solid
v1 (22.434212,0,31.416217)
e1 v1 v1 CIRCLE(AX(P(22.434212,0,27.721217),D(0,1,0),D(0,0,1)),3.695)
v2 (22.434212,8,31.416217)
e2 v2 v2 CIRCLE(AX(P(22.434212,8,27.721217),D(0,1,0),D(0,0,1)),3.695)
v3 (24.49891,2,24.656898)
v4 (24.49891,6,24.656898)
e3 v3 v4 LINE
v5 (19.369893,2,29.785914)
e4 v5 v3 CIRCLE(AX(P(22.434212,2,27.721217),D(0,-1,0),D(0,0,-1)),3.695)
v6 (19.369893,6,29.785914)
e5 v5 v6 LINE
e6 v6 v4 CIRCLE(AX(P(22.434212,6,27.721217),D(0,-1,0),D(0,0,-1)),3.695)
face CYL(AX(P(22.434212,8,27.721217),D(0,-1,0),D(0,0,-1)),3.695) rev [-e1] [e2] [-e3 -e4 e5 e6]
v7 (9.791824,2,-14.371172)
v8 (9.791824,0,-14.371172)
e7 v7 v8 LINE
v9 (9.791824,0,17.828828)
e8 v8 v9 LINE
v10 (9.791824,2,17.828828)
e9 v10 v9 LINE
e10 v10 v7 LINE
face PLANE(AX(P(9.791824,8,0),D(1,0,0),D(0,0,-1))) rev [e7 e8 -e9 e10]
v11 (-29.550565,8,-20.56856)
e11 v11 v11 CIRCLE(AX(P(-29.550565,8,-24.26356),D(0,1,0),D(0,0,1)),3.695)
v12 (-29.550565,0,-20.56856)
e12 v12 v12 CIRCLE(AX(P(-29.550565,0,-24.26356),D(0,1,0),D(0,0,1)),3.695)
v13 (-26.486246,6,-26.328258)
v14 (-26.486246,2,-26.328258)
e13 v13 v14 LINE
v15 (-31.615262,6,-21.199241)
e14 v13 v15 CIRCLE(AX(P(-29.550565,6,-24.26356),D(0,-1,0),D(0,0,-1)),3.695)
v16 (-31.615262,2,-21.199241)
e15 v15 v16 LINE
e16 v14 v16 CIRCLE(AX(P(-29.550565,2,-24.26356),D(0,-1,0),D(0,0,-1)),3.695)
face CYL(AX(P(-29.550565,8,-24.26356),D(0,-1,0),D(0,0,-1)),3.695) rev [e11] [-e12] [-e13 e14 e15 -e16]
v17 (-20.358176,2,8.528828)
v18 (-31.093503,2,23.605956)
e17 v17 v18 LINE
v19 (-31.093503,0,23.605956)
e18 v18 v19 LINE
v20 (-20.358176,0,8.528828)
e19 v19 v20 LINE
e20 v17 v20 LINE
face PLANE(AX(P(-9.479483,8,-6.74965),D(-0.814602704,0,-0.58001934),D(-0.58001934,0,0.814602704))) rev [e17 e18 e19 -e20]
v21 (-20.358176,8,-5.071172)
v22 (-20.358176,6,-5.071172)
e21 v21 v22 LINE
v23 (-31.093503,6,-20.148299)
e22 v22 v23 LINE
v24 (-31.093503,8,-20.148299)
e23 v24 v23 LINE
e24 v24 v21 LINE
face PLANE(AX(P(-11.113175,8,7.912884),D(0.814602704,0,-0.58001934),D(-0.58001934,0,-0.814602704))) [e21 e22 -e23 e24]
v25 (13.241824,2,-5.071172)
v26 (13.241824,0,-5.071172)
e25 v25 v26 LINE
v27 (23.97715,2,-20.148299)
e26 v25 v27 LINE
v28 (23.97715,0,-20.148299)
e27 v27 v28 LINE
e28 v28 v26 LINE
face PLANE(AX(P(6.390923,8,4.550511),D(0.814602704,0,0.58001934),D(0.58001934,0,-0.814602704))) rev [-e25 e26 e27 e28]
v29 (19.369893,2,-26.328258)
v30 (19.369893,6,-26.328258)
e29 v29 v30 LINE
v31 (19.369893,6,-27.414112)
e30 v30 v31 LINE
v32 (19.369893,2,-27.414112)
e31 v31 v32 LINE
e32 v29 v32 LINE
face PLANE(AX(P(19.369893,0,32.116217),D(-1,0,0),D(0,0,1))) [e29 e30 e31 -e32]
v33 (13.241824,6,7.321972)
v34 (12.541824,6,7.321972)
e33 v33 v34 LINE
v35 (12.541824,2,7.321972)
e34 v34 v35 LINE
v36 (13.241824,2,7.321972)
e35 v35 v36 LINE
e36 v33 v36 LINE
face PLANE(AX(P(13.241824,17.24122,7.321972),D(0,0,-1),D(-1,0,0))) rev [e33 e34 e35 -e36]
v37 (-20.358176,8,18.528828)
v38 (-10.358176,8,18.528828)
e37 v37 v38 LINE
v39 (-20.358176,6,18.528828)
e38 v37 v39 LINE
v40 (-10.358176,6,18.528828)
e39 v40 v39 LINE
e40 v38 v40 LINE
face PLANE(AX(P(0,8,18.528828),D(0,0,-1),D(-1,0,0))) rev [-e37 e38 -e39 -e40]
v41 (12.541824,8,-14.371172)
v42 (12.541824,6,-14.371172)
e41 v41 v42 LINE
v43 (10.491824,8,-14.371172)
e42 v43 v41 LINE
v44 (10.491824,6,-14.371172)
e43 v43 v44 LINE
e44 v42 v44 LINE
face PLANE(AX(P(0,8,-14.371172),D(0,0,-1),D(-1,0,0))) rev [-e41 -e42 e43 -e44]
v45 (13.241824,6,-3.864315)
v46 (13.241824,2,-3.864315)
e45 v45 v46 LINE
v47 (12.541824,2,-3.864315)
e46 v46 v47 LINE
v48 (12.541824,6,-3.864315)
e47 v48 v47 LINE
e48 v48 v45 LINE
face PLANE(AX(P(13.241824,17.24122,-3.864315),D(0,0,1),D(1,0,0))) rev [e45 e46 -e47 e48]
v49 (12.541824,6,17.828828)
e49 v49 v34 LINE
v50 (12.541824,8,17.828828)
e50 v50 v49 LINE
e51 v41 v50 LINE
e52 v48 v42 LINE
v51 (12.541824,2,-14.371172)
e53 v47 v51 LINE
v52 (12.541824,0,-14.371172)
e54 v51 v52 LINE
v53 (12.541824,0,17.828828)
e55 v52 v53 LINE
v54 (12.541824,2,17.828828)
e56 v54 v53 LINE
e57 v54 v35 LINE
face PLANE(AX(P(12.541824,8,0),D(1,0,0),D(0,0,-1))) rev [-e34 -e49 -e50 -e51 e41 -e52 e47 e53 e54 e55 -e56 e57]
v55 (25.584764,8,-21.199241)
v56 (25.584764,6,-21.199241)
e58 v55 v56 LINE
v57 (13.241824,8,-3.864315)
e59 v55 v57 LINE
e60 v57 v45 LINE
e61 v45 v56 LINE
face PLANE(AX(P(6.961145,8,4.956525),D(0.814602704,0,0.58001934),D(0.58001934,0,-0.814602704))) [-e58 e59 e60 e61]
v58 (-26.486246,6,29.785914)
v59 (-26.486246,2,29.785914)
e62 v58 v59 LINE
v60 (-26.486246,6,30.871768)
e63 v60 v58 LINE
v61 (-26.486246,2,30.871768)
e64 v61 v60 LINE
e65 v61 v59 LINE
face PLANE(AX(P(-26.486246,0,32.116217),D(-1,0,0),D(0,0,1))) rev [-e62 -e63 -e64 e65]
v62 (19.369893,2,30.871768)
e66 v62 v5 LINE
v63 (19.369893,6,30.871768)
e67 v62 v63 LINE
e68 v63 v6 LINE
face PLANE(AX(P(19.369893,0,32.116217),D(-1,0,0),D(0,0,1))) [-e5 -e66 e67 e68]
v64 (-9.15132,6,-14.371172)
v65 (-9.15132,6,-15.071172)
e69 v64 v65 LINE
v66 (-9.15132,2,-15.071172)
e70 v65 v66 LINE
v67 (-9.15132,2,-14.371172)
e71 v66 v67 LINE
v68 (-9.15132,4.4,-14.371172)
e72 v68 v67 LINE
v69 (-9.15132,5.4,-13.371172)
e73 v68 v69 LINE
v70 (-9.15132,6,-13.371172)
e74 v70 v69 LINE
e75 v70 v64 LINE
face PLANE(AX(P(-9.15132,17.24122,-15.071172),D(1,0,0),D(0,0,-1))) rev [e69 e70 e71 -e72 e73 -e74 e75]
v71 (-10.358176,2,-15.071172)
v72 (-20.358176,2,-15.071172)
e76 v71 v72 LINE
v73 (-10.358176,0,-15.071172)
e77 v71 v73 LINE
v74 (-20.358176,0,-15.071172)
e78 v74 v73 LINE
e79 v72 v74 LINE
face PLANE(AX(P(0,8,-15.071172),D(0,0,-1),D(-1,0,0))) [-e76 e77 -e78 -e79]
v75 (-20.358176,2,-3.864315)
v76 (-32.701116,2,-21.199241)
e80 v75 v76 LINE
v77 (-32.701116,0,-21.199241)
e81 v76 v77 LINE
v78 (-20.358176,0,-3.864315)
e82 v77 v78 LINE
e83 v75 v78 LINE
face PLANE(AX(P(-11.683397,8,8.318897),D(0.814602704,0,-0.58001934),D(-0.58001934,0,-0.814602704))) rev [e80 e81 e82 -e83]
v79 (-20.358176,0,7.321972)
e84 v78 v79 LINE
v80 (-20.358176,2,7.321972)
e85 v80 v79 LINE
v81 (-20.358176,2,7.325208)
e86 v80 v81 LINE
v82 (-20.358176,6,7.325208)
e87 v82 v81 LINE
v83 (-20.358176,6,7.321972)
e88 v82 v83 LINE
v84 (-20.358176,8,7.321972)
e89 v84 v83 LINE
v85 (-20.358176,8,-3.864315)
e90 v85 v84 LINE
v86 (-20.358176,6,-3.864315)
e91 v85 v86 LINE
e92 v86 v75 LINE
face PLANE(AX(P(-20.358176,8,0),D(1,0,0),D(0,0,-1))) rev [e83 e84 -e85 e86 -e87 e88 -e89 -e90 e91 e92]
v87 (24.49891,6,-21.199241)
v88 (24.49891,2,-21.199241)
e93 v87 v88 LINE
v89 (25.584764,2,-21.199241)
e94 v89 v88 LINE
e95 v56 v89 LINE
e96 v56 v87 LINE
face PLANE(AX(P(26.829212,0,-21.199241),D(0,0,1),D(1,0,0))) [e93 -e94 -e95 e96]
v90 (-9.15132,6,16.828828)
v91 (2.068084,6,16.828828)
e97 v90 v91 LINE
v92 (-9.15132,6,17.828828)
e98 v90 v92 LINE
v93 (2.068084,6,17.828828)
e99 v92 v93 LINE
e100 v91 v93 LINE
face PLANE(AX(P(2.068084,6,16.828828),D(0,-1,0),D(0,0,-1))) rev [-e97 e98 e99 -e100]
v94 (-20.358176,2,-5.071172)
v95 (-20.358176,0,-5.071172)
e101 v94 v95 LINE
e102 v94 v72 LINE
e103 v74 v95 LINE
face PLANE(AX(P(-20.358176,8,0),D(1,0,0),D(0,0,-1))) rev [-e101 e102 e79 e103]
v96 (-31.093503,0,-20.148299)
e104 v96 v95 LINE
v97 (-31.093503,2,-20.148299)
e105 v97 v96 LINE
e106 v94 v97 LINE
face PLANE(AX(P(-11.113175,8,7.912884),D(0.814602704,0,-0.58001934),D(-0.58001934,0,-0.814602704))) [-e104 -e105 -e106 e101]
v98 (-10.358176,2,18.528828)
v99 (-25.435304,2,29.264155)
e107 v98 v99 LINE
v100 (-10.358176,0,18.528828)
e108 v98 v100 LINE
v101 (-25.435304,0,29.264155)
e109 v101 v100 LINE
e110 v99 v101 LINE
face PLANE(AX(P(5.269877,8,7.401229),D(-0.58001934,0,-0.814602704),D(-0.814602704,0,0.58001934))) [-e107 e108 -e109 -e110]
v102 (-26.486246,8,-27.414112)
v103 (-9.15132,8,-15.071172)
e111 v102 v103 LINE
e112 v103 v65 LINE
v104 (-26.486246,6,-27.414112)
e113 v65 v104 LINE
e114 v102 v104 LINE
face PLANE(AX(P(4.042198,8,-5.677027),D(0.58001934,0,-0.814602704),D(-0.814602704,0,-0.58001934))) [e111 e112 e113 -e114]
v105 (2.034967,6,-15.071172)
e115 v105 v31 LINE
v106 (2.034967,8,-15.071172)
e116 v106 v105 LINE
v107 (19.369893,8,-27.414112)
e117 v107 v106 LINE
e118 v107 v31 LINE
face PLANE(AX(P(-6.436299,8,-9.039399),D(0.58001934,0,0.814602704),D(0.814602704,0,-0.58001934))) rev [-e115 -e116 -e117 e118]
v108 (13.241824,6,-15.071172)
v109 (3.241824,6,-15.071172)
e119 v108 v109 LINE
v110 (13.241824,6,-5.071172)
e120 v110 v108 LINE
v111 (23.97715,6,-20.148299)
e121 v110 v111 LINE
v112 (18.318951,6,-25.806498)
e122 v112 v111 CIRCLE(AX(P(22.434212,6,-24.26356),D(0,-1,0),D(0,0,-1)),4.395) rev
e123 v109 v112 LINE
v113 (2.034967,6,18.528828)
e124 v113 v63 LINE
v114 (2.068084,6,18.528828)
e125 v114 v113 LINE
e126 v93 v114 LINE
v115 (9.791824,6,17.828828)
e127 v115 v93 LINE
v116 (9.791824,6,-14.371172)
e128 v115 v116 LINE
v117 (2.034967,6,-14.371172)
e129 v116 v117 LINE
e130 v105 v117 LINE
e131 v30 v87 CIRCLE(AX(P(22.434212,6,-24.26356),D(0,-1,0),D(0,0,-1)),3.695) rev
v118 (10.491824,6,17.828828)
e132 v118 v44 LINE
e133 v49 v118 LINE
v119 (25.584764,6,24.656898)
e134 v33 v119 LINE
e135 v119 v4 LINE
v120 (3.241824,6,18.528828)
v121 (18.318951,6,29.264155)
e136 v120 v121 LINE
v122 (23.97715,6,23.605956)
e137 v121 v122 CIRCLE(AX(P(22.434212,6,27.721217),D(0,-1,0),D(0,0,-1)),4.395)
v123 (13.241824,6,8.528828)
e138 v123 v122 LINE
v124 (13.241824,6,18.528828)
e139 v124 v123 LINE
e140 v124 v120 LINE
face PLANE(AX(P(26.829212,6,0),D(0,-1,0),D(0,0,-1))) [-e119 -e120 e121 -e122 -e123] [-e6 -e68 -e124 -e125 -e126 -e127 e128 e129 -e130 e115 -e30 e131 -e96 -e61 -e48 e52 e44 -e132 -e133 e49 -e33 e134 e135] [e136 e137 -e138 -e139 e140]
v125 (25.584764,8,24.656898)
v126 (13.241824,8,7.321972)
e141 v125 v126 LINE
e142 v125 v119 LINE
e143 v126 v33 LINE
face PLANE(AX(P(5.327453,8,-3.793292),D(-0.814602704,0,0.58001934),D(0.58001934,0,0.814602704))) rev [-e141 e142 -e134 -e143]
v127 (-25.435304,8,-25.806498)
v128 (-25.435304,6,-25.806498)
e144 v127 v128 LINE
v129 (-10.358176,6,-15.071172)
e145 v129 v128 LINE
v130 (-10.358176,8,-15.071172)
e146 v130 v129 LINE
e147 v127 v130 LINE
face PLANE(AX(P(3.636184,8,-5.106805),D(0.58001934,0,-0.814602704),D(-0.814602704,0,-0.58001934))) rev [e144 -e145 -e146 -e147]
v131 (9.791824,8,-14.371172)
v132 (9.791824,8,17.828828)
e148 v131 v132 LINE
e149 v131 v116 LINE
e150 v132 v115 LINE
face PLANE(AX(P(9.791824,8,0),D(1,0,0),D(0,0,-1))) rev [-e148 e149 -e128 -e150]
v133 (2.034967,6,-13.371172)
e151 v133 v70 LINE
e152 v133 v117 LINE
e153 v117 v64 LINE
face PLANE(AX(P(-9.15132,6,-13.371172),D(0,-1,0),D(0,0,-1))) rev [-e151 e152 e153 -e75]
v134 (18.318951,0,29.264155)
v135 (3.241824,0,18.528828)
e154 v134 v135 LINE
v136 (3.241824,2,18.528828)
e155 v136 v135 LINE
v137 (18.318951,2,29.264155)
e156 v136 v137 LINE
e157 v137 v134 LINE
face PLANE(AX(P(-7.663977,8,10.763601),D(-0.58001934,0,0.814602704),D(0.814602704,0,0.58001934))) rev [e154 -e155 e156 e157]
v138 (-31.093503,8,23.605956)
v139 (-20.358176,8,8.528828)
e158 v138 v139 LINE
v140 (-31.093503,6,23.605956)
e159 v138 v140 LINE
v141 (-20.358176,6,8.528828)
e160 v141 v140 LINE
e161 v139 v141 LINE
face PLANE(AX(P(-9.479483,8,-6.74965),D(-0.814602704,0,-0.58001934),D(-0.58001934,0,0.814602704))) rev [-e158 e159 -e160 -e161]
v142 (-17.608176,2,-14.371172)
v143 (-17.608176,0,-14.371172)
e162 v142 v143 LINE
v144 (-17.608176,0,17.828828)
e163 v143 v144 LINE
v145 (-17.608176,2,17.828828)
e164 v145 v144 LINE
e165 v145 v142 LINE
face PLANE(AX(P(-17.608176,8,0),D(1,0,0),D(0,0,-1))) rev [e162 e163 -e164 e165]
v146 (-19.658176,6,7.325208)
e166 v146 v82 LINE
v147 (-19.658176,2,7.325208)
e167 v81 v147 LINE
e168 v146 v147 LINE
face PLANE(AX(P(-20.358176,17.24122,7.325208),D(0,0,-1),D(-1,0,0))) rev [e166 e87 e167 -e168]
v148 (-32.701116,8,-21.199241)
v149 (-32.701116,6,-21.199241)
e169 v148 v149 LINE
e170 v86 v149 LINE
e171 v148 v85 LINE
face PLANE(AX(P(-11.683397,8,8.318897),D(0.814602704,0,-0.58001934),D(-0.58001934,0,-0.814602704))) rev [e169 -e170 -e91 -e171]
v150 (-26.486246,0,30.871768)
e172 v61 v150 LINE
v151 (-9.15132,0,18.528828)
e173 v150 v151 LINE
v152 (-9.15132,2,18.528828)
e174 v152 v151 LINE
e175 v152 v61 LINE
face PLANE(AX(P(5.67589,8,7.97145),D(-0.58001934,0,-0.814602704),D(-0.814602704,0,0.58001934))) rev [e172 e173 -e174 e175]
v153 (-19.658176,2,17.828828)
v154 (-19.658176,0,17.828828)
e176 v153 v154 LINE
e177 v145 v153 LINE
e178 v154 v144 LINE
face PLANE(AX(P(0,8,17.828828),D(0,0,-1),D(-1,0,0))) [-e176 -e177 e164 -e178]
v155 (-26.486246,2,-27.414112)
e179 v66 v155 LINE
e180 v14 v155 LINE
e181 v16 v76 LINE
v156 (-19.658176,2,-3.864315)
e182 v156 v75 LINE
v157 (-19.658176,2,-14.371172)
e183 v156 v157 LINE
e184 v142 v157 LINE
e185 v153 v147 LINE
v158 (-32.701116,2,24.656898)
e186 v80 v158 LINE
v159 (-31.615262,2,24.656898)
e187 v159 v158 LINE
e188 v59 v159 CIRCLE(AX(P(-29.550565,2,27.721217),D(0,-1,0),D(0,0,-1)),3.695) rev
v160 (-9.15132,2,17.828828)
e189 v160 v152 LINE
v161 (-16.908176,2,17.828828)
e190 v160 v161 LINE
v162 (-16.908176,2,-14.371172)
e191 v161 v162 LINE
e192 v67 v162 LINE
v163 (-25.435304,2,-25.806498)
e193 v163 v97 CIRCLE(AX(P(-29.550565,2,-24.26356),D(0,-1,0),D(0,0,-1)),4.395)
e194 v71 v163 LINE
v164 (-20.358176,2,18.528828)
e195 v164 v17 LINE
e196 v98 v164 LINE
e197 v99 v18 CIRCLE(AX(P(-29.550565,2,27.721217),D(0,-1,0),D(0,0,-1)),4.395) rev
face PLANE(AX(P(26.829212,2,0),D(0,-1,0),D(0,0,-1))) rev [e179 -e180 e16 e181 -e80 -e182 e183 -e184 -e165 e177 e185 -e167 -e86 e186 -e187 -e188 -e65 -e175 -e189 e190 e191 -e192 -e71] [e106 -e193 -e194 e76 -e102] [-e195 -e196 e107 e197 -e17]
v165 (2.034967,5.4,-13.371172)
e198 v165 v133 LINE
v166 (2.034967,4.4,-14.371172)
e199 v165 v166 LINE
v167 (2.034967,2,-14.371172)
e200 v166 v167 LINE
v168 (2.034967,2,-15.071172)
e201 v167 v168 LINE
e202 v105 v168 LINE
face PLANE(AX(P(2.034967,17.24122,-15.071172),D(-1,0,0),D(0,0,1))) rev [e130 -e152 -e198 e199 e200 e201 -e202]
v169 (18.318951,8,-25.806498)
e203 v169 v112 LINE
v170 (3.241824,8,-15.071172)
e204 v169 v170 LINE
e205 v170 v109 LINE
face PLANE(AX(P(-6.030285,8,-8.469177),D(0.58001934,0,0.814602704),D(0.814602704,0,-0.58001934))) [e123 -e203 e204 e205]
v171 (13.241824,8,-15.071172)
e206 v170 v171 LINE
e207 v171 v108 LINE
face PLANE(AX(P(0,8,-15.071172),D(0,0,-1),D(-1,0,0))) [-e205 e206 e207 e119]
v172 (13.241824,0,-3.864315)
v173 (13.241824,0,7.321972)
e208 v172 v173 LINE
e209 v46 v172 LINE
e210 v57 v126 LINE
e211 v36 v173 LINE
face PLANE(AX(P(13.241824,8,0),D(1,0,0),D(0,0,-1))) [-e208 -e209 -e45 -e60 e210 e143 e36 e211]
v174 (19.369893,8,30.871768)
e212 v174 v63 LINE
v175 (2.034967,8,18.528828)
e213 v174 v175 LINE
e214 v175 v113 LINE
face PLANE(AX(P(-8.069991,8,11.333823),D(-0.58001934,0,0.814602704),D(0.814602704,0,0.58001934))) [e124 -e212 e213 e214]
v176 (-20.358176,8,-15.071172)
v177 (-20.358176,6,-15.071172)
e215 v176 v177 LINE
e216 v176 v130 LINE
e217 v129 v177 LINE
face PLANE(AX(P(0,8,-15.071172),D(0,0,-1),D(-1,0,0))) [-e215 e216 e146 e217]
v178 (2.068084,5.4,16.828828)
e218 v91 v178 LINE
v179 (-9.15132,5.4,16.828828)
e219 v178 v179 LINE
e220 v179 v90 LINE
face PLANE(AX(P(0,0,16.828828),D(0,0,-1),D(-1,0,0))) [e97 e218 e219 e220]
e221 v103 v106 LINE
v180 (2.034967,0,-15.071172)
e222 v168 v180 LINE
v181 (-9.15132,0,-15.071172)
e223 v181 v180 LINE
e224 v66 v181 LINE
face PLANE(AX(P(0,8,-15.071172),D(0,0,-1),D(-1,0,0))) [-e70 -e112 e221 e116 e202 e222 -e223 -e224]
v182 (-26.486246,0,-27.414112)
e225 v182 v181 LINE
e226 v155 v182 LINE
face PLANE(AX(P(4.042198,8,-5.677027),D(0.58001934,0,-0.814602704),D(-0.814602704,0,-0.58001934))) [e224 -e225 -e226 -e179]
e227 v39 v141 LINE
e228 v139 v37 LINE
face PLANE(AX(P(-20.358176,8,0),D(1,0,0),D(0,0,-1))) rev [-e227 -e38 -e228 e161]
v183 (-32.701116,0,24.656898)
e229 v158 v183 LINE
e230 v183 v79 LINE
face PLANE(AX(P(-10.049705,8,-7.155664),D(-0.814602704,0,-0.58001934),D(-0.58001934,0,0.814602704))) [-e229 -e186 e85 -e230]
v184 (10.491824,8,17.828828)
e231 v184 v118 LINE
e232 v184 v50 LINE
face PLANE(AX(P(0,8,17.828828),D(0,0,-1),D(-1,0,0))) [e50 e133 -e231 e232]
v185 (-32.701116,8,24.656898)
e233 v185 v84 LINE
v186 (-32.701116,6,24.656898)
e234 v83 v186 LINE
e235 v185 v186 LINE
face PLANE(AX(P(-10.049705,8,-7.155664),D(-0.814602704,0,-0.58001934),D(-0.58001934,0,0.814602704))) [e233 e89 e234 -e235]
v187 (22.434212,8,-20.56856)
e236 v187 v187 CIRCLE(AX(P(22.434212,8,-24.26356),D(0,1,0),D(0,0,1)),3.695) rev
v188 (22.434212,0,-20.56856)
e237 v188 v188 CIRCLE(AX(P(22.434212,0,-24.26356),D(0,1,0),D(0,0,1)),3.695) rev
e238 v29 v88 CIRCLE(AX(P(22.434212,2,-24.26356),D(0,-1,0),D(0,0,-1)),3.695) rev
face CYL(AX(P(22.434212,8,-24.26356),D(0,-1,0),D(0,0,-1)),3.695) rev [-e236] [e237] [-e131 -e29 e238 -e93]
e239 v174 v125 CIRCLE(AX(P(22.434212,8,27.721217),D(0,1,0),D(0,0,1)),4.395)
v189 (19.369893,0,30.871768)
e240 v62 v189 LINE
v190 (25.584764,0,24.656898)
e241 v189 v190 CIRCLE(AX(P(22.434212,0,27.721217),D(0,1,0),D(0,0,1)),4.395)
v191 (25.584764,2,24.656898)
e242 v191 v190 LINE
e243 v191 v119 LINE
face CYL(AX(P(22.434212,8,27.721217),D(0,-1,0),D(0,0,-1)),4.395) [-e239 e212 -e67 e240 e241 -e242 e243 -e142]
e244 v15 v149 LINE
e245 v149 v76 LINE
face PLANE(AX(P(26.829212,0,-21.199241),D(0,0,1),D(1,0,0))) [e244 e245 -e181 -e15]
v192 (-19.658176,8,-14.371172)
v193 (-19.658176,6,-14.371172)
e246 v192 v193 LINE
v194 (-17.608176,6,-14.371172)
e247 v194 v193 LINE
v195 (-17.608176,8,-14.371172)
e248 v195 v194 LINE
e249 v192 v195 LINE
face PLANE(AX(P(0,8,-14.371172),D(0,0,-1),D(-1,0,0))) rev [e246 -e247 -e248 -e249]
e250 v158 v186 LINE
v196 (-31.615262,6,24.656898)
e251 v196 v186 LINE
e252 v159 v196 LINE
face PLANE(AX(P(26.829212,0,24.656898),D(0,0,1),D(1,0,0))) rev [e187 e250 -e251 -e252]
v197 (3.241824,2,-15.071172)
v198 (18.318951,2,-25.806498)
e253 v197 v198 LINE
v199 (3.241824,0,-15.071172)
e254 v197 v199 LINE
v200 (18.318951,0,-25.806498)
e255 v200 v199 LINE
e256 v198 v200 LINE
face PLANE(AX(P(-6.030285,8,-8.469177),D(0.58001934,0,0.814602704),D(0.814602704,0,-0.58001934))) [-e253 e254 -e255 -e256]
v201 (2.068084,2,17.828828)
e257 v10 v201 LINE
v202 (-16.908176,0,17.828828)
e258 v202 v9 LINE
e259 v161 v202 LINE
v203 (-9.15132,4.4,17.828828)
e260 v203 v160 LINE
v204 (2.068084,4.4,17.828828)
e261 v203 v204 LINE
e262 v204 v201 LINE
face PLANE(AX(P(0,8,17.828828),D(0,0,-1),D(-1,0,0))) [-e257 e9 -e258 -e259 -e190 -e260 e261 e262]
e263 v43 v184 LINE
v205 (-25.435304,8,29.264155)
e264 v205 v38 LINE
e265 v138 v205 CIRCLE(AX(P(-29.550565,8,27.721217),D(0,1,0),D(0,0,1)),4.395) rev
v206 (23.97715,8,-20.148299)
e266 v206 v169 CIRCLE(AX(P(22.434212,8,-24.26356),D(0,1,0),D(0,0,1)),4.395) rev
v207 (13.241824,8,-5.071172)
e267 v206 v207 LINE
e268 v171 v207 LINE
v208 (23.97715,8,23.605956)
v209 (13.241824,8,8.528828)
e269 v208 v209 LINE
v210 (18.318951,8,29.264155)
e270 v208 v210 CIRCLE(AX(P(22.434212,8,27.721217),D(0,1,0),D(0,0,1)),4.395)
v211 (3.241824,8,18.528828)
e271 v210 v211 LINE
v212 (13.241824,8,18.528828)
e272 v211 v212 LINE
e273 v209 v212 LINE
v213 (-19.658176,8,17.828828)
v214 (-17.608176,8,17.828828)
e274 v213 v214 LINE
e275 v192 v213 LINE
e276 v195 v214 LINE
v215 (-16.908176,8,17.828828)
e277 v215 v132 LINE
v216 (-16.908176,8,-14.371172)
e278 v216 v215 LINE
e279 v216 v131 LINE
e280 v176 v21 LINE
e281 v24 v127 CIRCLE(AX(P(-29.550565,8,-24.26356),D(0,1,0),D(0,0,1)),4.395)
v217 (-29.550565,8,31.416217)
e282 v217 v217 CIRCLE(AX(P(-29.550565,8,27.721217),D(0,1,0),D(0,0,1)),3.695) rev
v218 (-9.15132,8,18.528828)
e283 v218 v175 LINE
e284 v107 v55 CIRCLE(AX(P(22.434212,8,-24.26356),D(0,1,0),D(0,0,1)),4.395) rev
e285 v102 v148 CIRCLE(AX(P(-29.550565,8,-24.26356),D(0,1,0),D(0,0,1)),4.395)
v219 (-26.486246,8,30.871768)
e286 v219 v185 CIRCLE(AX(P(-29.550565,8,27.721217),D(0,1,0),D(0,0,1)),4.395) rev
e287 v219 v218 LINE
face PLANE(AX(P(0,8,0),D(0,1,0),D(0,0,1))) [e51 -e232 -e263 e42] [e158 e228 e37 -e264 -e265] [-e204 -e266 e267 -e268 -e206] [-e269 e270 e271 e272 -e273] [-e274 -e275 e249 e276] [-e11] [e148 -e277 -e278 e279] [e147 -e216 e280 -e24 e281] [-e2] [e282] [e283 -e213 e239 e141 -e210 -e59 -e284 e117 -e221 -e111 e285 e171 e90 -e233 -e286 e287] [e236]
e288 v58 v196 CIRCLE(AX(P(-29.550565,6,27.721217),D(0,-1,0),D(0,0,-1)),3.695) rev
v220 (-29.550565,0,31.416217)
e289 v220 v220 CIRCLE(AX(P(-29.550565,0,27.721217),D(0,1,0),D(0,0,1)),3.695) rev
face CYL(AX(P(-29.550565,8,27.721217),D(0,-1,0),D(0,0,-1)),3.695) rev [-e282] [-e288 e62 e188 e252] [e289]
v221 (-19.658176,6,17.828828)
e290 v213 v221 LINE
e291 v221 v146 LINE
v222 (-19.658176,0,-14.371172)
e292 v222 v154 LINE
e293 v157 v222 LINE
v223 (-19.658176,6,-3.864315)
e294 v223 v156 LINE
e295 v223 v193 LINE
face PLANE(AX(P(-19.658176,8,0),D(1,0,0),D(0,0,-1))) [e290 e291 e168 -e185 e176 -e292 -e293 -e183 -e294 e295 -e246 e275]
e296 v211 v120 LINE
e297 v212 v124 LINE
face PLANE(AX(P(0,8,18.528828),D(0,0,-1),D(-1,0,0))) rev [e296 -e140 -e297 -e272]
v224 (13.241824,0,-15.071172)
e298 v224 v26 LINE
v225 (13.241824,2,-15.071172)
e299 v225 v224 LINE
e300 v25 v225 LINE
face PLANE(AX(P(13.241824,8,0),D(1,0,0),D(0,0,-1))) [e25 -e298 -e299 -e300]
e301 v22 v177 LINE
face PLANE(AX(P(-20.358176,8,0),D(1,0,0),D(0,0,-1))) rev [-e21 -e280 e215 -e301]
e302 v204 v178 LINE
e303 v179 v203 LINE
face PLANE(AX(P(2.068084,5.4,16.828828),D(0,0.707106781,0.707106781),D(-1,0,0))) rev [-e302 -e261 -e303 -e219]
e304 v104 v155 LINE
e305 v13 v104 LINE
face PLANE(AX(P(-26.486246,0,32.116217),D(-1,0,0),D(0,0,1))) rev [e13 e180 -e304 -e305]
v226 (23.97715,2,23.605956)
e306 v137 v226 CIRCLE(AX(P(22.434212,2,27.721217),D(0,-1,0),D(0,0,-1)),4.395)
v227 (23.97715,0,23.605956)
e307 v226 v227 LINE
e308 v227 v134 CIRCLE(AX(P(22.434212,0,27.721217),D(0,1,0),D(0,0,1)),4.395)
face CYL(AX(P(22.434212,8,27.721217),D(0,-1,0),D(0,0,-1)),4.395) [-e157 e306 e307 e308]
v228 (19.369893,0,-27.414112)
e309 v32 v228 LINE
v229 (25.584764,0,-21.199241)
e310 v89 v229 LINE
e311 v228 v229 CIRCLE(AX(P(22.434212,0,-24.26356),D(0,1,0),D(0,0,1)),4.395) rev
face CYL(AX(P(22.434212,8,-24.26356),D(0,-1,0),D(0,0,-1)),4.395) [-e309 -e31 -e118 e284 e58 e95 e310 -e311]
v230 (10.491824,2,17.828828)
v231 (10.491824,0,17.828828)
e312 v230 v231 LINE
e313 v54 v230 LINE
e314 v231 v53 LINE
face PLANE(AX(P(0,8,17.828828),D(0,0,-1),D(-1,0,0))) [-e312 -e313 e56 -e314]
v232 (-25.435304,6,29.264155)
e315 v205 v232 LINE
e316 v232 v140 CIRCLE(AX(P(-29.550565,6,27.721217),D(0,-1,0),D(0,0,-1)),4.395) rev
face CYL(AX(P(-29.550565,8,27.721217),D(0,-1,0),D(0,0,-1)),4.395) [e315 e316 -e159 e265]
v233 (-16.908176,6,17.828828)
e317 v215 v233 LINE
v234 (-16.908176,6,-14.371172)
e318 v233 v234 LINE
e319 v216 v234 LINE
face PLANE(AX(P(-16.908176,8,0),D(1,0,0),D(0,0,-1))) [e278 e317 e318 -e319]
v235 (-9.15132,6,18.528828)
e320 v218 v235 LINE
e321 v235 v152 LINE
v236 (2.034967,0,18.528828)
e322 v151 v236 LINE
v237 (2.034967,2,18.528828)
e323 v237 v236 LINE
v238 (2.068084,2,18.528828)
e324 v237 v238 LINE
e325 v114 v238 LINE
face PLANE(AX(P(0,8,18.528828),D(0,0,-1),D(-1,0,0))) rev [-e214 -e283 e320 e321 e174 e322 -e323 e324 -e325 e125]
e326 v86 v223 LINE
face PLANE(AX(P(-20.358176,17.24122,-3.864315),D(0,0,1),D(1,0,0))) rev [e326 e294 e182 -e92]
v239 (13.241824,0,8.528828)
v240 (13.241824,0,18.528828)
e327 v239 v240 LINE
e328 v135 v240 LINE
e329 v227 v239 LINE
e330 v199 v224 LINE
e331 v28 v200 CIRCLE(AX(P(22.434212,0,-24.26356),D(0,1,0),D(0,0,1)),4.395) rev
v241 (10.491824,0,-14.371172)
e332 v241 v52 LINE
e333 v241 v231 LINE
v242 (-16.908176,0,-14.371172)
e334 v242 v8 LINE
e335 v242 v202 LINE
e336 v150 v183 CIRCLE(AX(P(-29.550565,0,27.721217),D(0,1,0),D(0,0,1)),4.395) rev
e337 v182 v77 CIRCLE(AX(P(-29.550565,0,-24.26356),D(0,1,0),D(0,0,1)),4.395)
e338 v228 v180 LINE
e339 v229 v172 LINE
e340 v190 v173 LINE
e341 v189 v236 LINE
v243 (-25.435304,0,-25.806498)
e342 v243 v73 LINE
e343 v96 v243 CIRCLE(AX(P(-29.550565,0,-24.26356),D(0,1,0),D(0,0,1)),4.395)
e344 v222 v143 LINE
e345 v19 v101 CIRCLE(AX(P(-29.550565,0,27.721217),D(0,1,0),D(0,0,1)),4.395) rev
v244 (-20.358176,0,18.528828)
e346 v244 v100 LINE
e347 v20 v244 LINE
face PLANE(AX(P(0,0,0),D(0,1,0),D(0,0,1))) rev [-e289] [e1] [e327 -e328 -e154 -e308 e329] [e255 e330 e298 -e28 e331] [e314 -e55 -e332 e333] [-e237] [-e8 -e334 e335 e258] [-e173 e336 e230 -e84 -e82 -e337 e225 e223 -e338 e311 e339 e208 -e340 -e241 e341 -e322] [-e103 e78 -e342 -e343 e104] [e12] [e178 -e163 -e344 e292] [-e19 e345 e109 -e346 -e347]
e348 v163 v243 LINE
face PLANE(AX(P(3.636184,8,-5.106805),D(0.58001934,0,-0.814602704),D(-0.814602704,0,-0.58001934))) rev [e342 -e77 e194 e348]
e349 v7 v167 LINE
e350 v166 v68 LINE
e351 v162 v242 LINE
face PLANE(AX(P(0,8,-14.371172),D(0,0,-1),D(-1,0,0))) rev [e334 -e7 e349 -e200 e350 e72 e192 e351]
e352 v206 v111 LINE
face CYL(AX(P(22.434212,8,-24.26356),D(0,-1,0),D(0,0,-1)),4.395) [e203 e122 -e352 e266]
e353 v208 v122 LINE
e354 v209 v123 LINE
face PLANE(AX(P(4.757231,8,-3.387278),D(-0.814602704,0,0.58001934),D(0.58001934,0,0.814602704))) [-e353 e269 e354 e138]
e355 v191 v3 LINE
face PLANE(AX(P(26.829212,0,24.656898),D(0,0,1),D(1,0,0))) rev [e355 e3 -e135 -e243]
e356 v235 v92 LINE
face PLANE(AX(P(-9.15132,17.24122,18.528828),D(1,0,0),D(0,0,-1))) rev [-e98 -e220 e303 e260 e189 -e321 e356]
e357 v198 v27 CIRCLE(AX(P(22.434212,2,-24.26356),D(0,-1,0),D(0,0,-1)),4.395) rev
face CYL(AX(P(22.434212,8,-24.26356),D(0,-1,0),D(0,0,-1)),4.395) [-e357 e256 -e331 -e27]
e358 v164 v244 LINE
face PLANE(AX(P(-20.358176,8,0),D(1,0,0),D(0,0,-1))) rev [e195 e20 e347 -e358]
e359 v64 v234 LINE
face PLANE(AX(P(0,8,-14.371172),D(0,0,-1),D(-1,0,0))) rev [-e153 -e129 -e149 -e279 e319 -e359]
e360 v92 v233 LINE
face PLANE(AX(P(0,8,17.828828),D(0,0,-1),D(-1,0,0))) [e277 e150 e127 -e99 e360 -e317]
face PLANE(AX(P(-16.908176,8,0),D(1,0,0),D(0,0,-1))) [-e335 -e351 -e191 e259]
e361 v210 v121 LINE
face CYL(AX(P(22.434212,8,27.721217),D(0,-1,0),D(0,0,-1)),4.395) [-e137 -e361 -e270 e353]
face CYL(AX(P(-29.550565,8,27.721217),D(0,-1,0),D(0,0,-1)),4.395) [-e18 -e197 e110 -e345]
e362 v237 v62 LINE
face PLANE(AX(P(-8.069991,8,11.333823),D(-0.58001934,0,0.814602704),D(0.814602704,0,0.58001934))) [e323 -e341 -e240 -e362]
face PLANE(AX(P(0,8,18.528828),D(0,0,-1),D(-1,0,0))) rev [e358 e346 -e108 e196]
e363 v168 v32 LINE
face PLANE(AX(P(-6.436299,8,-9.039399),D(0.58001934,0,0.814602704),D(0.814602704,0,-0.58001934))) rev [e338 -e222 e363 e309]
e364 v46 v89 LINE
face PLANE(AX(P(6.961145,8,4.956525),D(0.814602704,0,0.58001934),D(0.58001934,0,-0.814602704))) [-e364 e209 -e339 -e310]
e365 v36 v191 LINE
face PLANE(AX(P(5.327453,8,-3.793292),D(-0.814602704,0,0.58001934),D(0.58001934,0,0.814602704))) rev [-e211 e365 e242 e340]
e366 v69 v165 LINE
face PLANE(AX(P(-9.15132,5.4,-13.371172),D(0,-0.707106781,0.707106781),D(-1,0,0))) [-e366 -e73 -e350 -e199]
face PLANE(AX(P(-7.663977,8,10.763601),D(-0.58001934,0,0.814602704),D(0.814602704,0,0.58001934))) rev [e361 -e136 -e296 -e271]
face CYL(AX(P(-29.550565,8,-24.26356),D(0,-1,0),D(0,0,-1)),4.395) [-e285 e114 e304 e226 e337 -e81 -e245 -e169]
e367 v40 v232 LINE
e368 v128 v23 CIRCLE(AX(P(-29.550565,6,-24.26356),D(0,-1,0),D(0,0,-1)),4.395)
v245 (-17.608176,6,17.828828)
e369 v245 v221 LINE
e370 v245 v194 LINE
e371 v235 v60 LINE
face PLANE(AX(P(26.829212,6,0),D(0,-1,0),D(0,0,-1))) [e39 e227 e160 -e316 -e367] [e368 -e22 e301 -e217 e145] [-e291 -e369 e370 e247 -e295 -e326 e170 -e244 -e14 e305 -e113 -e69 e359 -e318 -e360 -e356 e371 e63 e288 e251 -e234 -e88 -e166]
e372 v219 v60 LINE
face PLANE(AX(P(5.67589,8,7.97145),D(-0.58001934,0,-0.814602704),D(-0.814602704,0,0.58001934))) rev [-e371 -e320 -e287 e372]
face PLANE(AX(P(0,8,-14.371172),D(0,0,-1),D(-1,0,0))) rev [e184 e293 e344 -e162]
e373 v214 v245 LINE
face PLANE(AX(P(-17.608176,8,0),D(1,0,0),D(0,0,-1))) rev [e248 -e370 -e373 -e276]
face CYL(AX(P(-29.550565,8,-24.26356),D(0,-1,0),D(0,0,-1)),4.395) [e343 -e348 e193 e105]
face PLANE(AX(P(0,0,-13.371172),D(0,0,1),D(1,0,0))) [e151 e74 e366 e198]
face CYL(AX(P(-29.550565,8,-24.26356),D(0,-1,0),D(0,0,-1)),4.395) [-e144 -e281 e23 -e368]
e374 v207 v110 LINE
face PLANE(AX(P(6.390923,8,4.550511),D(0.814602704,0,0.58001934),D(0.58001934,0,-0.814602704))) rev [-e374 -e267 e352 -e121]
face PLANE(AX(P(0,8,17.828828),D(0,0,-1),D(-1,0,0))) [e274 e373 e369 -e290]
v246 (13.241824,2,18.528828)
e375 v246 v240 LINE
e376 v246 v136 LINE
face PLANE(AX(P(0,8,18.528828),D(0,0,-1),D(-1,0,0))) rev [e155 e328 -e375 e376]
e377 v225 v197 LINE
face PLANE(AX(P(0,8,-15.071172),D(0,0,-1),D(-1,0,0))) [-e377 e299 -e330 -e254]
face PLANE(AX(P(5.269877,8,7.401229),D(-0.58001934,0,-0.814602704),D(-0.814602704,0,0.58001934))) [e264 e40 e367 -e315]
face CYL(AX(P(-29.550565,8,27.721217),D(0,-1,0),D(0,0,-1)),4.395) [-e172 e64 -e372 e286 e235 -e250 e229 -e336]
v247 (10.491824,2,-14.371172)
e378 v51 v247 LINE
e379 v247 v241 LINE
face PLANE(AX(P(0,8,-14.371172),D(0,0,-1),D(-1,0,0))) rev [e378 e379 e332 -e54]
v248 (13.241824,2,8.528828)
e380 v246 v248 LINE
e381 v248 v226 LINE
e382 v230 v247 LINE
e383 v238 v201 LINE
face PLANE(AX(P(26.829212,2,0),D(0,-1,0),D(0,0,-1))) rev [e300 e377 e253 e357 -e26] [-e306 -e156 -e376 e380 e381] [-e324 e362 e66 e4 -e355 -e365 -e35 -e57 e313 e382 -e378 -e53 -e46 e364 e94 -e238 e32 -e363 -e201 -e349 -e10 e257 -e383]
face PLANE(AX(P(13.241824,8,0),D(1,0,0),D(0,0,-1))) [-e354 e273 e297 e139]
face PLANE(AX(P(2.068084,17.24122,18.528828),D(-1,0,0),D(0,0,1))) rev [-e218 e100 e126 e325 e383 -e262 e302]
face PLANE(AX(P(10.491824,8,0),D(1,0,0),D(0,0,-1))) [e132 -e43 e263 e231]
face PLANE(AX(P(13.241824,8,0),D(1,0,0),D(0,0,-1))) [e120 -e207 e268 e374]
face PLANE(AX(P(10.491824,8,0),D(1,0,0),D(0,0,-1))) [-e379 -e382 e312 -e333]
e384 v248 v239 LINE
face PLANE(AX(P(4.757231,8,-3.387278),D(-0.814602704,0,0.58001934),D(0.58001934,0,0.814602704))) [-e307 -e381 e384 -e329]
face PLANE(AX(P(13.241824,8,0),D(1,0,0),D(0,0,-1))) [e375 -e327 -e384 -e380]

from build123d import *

# Parameters (mm, degrees)
SKETCH1_R               = 3.695
SKETCH1_W               = 2.05
SKETCH1_H               = 32.2
SKETCH1_W_2             = 26.7
BOSS_EXTRUDE1_DEPTH     = 8
CUT_EXTRUDE1_DEPTH      = 58.637669713
CUT_EXTRUDE1_DEPTH_BACK = 58.637669713
SKETCH2_W               = 17.334925969
SKETCH2_H               = 2
SKETCH2_W_2             = 11.186287382
CUT_EXTRUDE2_DEPTH      = 59.676664498
CUT_EXTRUDE2_DEPTH_BACK = 59.676664498
SKETCH5_W               = 45.85613932
SKETCH5_H               = 2
SKETCH6_W               = 0.7
SKETCH6_H               = 11.18952338
SKETCH6_W_2             = 11.219404543
SKETCH6_H_2             = 0.7
SKETCH6_H_3             = 11.186287382
SKETCH6_W_3             = 11.186287383
BOSS_EXTRUDE2_DEPTH     = 4
SKETCH7_W               = 11.186287383
SKETCH7_H               = 0.6
BOSS_EXTRUDE3_DEPTH     = 1
CHAMFER1_SIZE           = 1
SKETCH8_W               = 11.219404543
SKETCH8_H               = 0.6
BOSS_EXTRUDE4_DEPTH     = 1
CHAMFER2_SIZE           = 1
SKETCH9_W               = 0.999620658
SKETCH9_H               = 4
CUT_EXTRUDE3_DEPTH      = 0.999620658
CUT_EXTRUDE4_REACH      = 64.753
SKETCH10_W              = 0.999620658
SKETCH10_H              = 4
CUT_EXTRUDE5_REACH      = 64.753
SKETCH11_W              = 0.999620658
SKETCH11_H              = 4
CUT_EXTRUDE6_REACH      = 65.709
SKETCH12_W              = 0.999620658
SKETCH12_H              = 4


with BuildPart() as part:
    # Sketch1 → Boss-Extrude1 (new body)
    with BuildSketch(Plane(origin=(0, 0, 0), x_dir=(1, 0, 0), z_dir=(0, 1, 0))):
        with BuildLine():
            ThreePointArc((-26.486246099, 27.414111587), (-32.658298898, 27.371294009), (-32.701116476, 21.19924121))
            Line((-32.701116476, 21.19924121), (-20.928398332, 4.665158012))
            Line((-20.928398332, 4.665158012), (-20.358176439, 3.864315241))
            Line((-20.358176439, 3.864315241), (-20.358176439, -7.321972141))
            Line((-20.358176439, -7.321972141), (-20.928398332, -8.122814912))
            Line((-20.928398332, -8.122814912), (-32.701116476, -24.65689811))
            ThreePointArc((-32.701116476, -24.65689811), (-32.658298898, -30.828950909), (-26.486246099, -30.871768487))
            Line((-26.486246099, -30.871768487), (-9.952162901, -19.099050343))
            Line((-9.952162901, -19.099050343), (-9.151320131, -18.52882845))
            Line((-9.151320131, -18.52882845), (2.034967252, -18.52882845))
            Line((2.034967252, -18.52882845), (2.835810023, -19.099050343))
            Line((2.835810023, -19.099050343), (19.369893221, -30.871768487))
            ThreePointArc((19.369893221, -30.871768487), (25.54194602, -30.828950909), (25.584763598, -24.65689811))
            Line((25.584763598, -24.65689811), (13.812045453, -8.122814912))
            Line((13.812045453, -8.122814912), (13.241823561, -7.321972141))
            Line((13.241823561, -7.321972141), (13.241823561, 3.864315241))
            Line((13.241823561, 3.864315241), (13.812045453, 4.665158012))
            Line((13.812045453, 4.665158012), (25.584763598, 21.19924121))
            ThreePointArc((25.584763598, 21.19924121), (25.54194602, 27.371294009), (19.369893221, 27.414111587))
            Line((19.369893221, 27.414111587), (2.835810023, 15.641393443))
            Line((2.835810023, 15.641393443), (2.034967252, 15.07117155))
            Line((2.034967252, 15.07117155), (-9.151320131, 15.07117155))
            Line((-9.151320131, 15.07117155), (-9.952162901, 15.641393443))
            Line((-9.952162901, 15.641393443), (-26.486246099, 27.414111587))
        make_face()
        with Locations(Location((-29.550564595, -27.721216605, 0), (0, 0, 270))):
            Circle(SKETCH1_R, mode=Mode.SUBTRACT)
        with BuildLine():
            Line((-20.358176439, -8.52882845), (-20.358176439, -18.52882845))
            Line((-20.358176439, -18.52882845), (-10.358176439, -18.52882845))
            Line((-10.358176439, -18.52882845), (-25.435304322, -29.264154677))
            ThreePointArc((-25.435304322, -29.264154677), (-26.442830291, -24.613482302), (-31.093502666, -23.605956333))
            Line((-31.093502666, -23.605956333), (-20.358176439, -8.52882845))
        make_face(mode=Mode.SUBTRACT)
        with Locations((-18.633176439, -1.72882845)):
            Rectangle(SKETCH1_W, SKETCH1_H, mode=Mode.SUBTRACT)
        with Locations((-3.558176439, -1.72882845)):
            Rectangle(SKETCH1_W_2, SKETCH1_H, mode=Mode.SUBTRACT)
        with Locations(Location((22.434211716, -27.721216605, 0), (0, 0, 270))):
            Circle(SKETCH1_R, mode=Mode.SUBTRACT)
        with BuildLine():
            ThreePointArc((23.977149788, -23.605956333), (19.326477413, -24.613482302), (18.318951444, -29.264154677))
            Line((18.318951444, -29.264154677), (3.241823561, -18.52882845))
            Line((3.241823561, -18.52882845), (13.241823561, -18.52882845))
            Line((13.241823561, -18.52882845), (13.241823561, -8.52882845))
            Line((13.241823561, -8.52882845), (23.977149788, -23.605956333))
        make_face(mode=Mode.SUBTRACT)
        with Locations((11.516823561, -1.72882845)):
            Rectangle(SKETCH1_W, SKETCH1_H, mode=Mode.SUBTRACT)
        with BuildLine():
            Line((-10.358176439, 15.07117155), (-20.358176439, 15.07117155))
            Line((-20.358176439, 15.07117155), (-20.358176439, 5.07117155))
            Line((-20.358176439, 5.07117155), (-31.093502666, 20.148299433))
            ThreePointArc((-31.093502666, 20.148299433), (-26.442830291, 21.155825402), (-25.435304322, 25.806497777))
            Line((-25.435304322, 25.806497777), (-10.358176439, 15.07117155))
        make_face(mode=Mode.SUBTRACT)
        with Locations(Location((-29.550564595, 24.263559705, 0), (0, 0, 270))):
            Circle(SKETCH1_R, mode=Mode.SUBTRACT)
        with BuildLine():
            Line((13.241823561, 5.07117155), (13.241823561, 15.07117155))
            Line((13.241823561, 15.07117155), (3.241823561, 15.07117155))
            Line((3.241823561, 15.07117155), (18.318951444, 25.806497777))
            ThreePointArc((18.318951444, 25.806497777), (19.326477413, 21.155825402), (23.977149788, 20.148299433))
            Line((23.977149788, 20.148299433), (13.241823561, 5.07117155))
        make_face(mode=Mode.SUBTRACT)
        with Locations(Location((22.434211716, 24.263559705, 0), (0, 0, 270))):
            Circle(SKETCH1_R, mode=Mode.SUBTRACT)
    extrude(amount=BOSS_EXTRUDE1_DEPTH)

    # Sketch2 → Cut-Extrude1 (cut, two sides: drawn at the far end of the back side and taken through both)
    with BuildSketch(Plane.ZY.offset(20.358176439).offset(-CUT_EXTRUDE1_DEPTH_BACK)):
        with Locations((-12.531778226, 5)):
            Rectangle(SKETCH2_W, SKETCH2_H)
        with Locations((1.72882845, 5)):
            Rectangle(SKETCH2_W_2, SKETCH2_H)
        with Locations((15.989435126, 5)):
            Rectangle(SKETCH2_W, SKETCH2_H)
        with Locations((-12.531778226, 3)):
            Rectangle(SKETCH2_W, SKETCH2_H)
        with Locations((1.72882845, 3)):
            Rectangle(SKETCH2_W_2, SKETCH2_H)
        with Locations((15.989435126, 3)):
            Rectangle(SKETCH2_W, SKETCH2_H)
    extrude(amount=CUT_EXTRUDE1_DEPTH + CUT_EXTRUDE1_DEPTH_BACK, mode=Mode.SUBTRACT)

    # Sketch5 → Cut-Extrude2 (cut, two sides: drawn at the far end of the back side and taken through both)
    with BuildSketch(Plane(origin=(0, 0, -15.07117155), x_dir=(-1, 0, 0), z_dir=(0, 0, -1)).offset(-CUT_EXTRUDE2_DEPTH_BACK)):
        Polygon((-19.369893221, 6), (-19.369893221, 4), (26.486246099, 4), (26.486246099, 6), (9.151320131, 6), (-2.034967252, 6), align=None)
        with Locations((3.558176439, 3)):
            Rectangle(SKETCH5_W, SKETCH5_H)
    extrude(amount=CUT_EXTRUDE2_DEPTH + CUT_EXTRUDE2_DEPTH_BACK, mode=Mode.SUBTRACT)

    # Sketch6 → Boss-Extrude2 (add)
    with BuildSketch(Plane(origin=(0, 2, 0), x_dir=(1, 0, 0), z_dir=(0, 1, 0))):
        with Locations((-20.008176439, -1.730446449)):
            Rectangle(SKETCH6_W, SKETCH6_H)
        with Locations((-3.54161786, -18.17882845)):
            Rectangle(SKETCH6_W_2, SKETCH6_H_2)
        with Locations((12.891823561, -1.72882845)):
            Rectangle(SKETCH6_W, SKETCH6_H_3)
        with Locations((-3.55817644, 14.72117155)):
            Rectangle(SKETCH6_W_3, SKETCH6_H_2)
    extrude(amount=BOSS_EXTRUDE2_DEPTH)

    # Sketch7 → Boss-Extrude3 (add)
    with BuildSketch(Plane.XY.offset(-14.37117155)):
        with Locations((-3.55817644, 5.7)):
            Rectangle(SKETCH7_W, SKETCH7_H)
    extrude(amount=BOSS_EXTRUDE3_DEPTH)

    # Chamfer1
    chamfer1_edges = [part.edges().sort_by_distance(p)[0] for p in [
        (-3.558176439, 5.4, -14.37117155),
    ]]
    chamfer(chamfer1_edges, length=CHAMFER1_SIZE - 0.0001)  # a hair under: the kernel refuses the full size

    # Sketch8 → Boss-Extrude4 (add)
    with BuildSketch(Plane(origin=(0, 0, 17.82882845), x_dir=(-1, 0, 0), z_dir=(0, 0, -1))):
        with Locations((3.54161786, 5.7)):
            Rectangle(SKETCH8_W, SKETCH8_H)
    extrude(amount=BOSS_EXTRUDE4_DEPTH)

    # Chamfer2
    chamfer2_edges = [part.edges().sort_by_distance(p)[0] for p in [
        (-3.541617859, 5.4, 17.82882845),
    ]]
    chamfer(chamfer2_edges, length=CHAMFER2_SIZE - 0.0001)  # a hair under: the kernel refuses the full size

    # Sketch9 → Cut-Extrude3 (cut)
    with BuildSketch(Plane(origin=(0, 0, 24.65689811), x_dir=(-1, 0, 0), z_dir=(0, 0, -1))):
        with Locations((-19.86970355, 4)):
            Rectangle(SKETCH9_W, SKETCH9_H)
    extrude(amount=-CUT_EXTRUDE3_DEPTH, mode=Mode.SUBTRACT)

    # Sketch10 → Cut-Extrude4 (cut, up to next)
    with BuildSketch(Plane(origin=(-26.486246099, 0, 0), x_dir=(0, 0, -1), z_dir=(1, 0, 0)), mode=Mode.PRIVATE) as cut_extrude4_sk1:
        with Locations((-25.156708439, 4)):
            Rectangle(SKETCH10_W, SKETCH10_H)
    cut_extrude4_tool1 = extrude(cut_extrude4_sk1.sketch, amount=-CUT_EXTRUDE4_REACH, mode=Mode.PRIVATE) & part.part
    add(cut_extrude4_tool1.solids().sort_by_distance((-26.486246, 4, 25.156708))[0], mode=Mode.SUBTRACT)

    # Sketch11 → Cut-Extrude5 (cut, up to next)
    with BuildSketch(Plane(origin=(-26.486246099, 0, 0), x_dir=(0, 0, -1), z_dir=(1, 0, 0)), mode=Mode.PRIVATE) as cut_extrude5_sk1:
        with Locations((21.699051539, 4)):
            Rectangle(SKETCH11_W, SKETCH11_H)
    cut_extrude5_tool1 = extrude(cut_extrude5_sk1.sketch, amount=-CUT_EXTRUDE5_REACH, mode=Mode.PRIVATE) & part.part
    add(cut_extrude5_tool1.solids().sort_by_distance((-26.486246, 4, -21.699052))[0], mode=Mode.SUBTRACT)

    # Sketch12 → Cut-Extrude6 (cut, up to next)
    with BuildSketch(Plane.XY.offset(-21.19924121), mode=Mode.PRIVATE) as cut_extrude6_sk1:
        with Locations((19.86970355, 4)):
            Rectangle(SKETCH12_W, SKETCH12_H)
    cut_extrude6_tool1 = extrude(cut_extrude6_sk1.sketch, amount=-CUT_EXTRUDE6_REACH, mode=Mode.PRIVATE) & part.part
    add(cut_extrude6_tool1.solids().sort_by_distance((19.869704, 4, -21.199241))[0], mode=Mode.SUBTRACT)


solid = part.part
